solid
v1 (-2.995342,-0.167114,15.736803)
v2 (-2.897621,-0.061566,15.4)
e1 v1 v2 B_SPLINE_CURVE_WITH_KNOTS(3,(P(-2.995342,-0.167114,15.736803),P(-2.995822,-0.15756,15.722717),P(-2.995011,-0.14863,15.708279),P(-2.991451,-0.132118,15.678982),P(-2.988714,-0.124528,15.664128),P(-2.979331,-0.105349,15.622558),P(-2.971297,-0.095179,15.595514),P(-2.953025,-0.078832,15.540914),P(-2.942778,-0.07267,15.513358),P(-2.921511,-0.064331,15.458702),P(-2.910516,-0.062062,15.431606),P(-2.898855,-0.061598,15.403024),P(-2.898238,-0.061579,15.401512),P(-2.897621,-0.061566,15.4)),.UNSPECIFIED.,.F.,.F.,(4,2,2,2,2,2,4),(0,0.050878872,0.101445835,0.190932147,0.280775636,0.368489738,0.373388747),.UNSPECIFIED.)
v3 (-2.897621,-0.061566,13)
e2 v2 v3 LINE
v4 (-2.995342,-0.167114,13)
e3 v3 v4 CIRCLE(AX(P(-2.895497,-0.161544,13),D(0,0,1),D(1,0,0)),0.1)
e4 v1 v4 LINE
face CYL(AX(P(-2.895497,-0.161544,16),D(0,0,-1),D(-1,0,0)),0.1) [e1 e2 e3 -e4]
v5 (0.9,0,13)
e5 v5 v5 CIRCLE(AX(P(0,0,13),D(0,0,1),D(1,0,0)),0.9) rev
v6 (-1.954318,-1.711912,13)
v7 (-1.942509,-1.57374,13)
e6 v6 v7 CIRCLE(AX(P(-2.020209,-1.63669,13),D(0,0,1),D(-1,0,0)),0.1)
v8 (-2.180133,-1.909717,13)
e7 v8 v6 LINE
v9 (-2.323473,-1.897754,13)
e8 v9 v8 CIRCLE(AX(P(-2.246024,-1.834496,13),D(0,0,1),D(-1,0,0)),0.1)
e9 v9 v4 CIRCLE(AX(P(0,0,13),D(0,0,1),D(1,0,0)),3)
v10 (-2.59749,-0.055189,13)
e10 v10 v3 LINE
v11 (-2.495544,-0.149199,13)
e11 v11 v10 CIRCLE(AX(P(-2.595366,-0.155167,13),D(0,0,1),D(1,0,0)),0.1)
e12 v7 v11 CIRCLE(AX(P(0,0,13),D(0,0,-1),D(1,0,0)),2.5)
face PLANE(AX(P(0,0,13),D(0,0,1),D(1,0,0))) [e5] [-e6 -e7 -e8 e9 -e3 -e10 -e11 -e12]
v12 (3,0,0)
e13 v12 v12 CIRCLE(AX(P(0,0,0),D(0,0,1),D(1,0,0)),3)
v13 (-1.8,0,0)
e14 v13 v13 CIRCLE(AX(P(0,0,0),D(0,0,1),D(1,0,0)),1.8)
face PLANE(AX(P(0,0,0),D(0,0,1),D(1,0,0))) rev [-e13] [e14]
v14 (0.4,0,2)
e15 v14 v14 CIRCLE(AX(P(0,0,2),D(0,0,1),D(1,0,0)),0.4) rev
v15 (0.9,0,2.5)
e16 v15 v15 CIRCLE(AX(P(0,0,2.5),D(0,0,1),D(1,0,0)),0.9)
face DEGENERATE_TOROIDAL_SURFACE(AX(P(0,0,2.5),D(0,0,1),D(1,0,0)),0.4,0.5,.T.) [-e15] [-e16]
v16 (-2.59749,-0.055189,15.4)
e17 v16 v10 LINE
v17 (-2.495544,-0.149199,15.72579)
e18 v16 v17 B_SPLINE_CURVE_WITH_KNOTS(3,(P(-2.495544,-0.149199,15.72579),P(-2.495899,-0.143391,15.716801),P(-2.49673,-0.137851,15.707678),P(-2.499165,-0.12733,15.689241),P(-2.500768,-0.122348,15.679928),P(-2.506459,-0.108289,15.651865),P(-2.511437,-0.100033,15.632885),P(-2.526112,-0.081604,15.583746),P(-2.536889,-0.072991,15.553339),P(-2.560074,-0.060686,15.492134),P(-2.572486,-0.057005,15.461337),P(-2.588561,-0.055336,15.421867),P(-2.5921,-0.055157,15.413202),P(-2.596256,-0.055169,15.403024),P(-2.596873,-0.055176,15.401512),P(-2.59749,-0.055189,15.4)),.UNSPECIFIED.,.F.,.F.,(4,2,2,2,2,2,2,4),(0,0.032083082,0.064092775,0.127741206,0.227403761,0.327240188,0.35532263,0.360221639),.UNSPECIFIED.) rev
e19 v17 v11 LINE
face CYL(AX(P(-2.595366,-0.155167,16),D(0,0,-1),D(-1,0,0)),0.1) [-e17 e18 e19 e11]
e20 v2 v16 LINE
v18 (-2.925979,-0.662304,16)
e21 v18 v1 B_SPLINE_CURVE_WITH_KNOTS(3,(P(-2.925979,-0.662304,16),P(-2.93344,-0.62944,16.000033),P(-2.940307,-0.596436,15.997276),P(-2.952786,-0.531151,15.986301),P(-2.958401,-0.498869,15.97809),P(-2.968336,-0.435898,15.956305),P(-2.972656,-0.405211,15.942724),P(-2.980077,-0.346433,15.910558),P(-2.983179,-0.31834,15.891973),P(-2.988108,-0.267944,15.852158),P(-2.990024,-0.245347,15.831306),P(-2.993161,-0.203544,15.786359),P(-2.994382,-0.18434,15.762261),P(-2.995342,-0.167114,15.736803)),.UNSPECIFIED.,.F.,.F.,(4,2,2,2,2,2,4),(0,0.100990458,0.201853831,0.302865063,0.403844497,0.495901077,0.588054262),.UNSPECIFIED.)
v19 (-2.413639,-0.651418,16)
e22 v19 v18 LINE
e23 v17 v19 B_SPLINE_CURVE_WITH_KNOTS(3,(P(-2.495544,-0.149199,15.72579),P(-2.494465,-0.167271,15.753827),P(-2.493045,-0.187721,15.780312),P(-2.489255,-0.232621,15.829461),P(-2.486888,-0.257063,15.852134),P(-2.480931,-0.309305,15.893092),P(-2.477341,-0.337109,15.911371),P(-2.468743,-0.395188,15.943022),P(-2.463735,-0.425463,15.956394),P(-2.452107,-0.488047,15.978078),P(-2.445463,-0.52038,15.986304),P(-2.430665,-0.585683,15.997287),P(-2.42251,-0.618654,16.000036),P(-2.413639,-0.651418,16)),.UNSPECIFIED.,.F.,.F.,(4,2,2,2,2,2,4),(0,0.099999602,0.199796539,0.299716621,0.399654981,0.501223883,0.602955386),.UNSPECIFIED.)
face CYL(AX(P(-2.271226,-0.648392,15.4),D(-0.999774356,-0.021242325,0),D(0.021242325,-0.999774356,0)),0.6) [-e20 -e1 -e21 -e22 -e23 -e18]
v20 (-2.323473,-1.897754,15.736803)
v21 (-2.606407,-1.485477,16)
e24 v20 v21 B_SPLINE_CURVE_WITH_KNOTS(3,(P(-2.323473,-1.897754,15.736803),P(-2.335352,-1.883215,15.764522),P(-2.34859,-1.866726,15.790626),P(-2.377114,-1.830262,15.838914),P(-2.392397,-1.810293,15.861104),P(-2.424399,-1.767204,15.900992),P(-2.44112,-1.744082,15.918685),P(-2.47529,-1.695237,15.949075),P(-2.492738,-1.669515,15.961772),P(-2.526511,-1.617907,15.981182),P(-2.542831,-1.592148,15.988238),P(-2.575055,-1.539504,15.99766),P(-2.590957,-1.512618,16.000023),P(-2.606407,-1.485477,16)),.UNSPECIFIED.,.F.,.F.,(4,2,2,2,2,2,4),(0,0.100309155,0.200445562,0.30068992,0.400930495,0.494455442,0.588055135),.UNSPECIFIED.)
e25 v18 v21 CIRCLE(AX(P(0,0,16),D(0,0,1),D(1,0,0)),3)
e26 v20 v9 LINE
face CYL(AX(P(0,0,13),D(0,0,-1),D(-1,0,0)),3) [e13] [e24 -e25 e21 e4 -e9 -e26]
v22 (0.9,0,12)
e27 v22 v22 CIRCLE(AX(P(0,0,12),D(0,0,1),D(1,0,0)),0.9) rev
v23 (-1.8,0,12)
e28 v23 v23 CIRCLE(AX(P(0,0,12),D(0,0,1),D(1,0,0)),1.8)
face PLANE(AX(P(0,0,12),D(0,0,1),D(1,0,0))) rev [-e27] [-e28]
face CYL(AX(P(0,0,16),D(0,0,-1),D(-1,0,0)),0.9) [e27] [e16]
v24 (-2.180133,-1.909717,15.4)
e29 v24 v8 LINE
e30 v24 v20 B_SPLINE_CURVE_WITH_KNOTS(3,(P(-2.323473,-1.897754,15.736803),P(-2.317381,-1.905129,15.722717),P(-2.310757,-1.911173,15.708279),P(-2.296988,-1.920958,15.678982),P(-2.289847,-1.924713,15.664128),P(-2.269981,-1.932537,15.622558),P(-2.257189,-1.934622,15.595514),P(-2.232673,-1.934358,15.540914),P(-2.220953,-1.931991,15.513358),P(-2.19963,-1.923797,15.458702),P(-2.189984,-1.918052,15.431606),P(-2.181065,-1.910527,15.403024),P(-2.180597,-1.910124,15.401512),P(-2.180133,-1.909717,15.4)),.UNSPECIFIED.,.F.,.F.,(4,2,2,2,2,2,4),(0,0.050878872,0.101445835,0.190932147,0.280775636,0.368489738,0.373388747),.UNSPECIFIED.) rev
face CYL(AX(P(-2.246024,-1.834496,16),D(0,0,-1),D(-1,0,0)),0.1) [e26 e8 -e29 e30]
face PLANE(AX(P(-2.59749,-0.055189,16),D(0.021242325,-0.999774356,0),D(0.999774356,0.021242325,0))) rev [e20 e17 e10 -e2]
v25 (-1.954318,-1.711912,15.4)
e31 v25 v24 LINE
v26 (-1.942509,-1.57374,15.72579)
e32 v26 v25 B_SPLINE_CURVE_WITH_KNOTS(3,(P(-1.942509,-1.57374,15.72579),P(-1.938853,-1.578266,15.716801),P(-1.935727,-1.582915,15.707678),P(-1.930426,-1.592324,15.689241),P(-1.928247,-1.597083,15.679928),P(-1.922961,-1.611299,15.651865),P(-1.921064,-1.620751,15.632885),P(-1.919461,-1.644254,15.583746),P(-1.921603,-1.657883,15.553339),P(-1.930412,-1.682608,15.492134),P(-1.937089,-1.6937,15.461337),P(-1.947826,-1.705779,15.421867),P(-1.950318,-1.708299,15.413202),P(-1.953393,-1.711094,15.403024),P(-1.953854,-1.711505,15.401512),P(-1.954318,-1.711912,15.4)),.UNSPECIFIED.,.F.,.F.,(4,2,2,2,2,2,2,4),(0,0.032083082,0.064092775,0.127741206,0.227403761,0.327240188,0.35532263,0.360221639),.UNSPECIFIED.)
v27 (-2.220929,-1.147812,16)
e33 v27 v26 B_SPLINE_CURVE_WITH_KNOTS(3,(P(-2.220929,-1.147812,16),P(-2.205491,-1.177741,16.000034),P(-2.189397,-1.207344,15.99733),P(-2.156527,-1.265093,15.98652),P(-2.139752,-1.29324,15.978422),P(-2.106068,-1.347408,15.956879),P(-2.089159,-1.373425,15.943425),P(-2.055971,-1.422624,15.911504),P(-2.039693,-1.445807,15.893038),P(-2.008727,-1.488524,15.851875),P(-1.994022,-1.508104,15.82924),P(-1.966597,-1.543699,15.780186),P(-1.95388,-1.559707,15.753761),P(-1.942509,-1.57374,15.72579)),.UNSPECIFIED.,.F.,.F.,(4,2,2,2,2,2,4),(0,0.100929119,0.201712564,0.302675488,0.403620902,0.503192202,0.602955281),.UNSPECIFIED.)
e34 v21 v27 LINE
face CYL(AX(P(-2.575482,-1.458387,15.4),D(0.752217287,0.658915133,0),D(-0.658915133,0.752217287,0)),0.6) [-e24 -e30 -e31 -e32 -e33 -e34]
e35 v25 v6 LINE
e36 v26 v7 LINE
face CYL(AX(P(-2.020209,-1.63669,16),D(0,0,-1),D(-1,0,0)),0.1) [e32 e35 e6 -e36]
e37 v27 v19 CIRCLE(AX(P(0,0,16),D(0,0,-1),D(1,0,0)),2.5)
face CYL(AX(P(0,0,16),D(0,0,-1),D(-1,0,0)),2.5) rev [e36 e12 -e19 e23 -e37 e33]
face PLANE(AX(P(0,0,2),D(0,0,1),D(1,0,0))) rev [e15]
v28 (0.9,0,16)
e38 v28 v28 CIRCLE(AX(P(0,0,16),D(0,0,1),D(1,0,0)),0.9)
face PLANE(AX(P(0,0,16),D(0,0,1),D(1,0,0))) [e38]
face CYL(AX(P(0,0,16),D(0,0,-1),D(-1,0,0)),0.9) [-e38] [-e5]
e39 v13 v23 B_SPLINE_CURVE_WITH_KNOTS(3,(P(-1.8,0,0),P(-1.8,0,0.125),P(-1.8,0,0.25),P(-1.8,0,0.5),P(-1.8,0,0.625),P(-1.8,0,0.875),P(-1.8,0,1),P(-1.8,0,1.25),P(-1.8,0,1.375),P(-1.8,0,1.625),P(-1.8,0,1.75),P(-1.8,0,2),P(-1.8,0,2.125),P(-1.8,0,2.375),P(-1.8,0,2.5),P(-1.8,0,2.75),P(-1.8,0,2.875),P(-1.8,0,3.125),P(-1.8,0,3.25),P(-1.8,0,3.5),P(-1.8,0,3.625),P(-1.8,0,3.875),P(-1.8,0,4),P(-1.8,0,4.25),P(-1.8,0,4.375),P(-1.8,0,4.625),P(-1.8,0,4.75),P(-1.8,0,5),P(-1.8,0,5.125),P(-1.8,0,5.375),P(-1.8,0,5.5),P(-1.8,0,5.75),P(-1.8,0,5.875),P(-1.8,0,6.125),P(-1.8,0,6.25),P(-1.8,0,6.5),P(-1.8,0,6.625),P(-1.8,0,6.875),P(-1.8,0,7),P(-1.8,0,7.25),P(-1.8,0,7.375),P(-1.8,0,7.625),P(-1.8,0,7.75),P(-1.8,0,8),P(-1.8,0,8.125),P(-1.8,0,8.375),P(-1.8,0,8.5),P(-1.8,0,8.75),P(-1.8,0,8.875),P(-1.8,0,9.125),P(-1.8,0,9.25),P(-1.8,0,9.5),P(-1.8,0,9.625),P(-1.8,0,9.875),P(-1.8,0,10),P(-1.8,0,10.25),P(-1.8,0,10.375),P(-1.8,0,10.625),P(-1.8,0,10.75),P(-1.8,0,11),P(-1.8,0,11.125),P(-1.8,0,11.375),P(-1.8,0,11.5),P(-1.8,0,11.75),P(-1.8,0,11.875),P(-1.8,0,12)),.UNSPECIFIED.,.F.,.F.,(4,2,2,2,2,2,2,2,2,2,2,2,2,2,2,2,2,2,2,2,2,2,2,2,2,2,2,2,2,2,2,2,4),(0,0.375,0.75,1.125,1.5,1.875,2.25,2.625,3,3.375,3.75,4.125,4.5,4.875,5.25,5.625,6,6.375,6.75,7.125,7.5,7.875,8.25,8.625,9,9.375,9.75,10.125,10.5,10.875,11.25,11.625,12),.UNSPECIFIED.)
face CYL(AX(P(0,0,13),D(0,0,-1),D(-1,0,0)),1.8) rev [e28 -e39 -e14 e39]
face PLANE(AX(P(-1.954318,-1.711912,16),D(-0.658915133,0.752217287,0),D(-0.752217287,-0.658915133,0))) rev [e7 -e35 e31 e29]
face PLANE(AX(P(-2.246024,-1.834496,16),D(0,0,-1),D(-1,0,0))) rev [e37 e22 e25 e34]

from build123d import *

# Parameters (mm, degrees)
SKETCH_1_R           = 3
SKETCH_1_R_2         = 1.8
EXTRUDE_1_DEPTH      = 13
EXTRUDE_2_DEPTH      = 3
EXTRUDE_2_DEPTH_BACK = 11
SKETCH_2_R           = 0.9
FILLET_1_R           = 0.5
EXTRUDE_START        = -1
SKETCH_3_R           = 3
EXTRUDE_3_DEPTH      = 1
EXTRUDE_4_DEPTH      = 3
FILLET_2_R           = 0.6


with BuildPart() as part:
    # 草图1 → 凸台-拉伸1 (new body)
    with BuildSketch(Plane.XY):
        with Locations(Location((0, 0, 0), (0, 0, 180))):
            Circle(SKETCH_1_R)
        with Locations(Location((0, 0, 0), (0, 0, 180))):
            Circle(SKETCH_1_R_2, mode=Mode.SUBTRACT)
    extrude(amount=EXTRUDE_1_DEPTH)



with BuildPart() as body_2:
    # 草图2 → 凸台-拉伸2 (new, two sides: drawn at the far end of the back side and taken through both)
    with BuildSketch(Plane.XY.offset(13).offset(-EXTRUDE_2_DEPTH_BACK)):
        Circle(SKETCH_2_R)
    extrude(amount=EXTRUDE_2_DEPTH + EXTRUDE_2_DEPTH_BACK)

    # 圆角1
    fillet_1_edges = [body_2.edges().sort_by_distance(p)[0] for p in [
        (-0.9, 0, 2),
    ]]
    fillet(fillet_1_edges, radius=FILLET_1_R)


with BuildPart() as part_1:
    add(part.part)

    add(body_2.part)  # 凸台-拉伸3 merges body 2
    # 草图3 → 凸台-拉伸3 (add)
    with BuildSketch(Plane.XY.offset(13).offset(EXTRUDE_START)):
        with Locations(Location((0, 0, 0), (0, 0, 180))):
            Circle(SKETCH_3_R)
    extrude(amount=EXTRUDE_3_DEPTH)

    # 草图4 → 凸台-拉伸4 (add)
    with BuildSketch(Plane.XY.offset(13)):
        with BuildLine():
            Line((-2.597489972, -0.055189178), (-2.897621372, -0.061566106))
            ThreePointArc((-2.897621372, -0.061566106), (-2.968876341, -0.093606123), (-2.995341868, -0.167114008))
            ThreePointArc((-2.995341868, -0.167114008), (-2.796645847, -1.085712673), (-2.323473449, -1.897754234))
            ThreePointArc((-2.323473449, -1.897754234), (-2.254341449, -1.934149288), (-2.18013282, -1.909717488))
            Line((-2.18013282, -1.909717488), (-1.954317839, -1.711911733))
            ThreePointArc((-1.954317839, -1.711911733), (-1.920572579, -1.645205485), (-1.942508993, -1.573740389))
            ThreePointArc((-1.942508993, -1.573740389), (-2.330538206, -0.904760561), (-2.49554398, -0.149198667))
            ThreePointArc((-2.49554398, -0.149198667), (-2.527574533, -0.081652314), (-2.597489972, -0.055189178))
        make_face()
    extrude(amount=EXTRUDE_4_DEPTH)

    # 圆角2
    # the kernel refuses this fillet: 0.6 mm, written as the material it takes off along each edge
    with BuildSketch(Plane(origin=(-1.097828437, -0.023325691, 16), x_dir=(0, 0, -1), z_dir=(-0.9997743563663354, -0.021242324549825015, 0)), Plane(origin=(-3.308458751, -2.898090189, 16), x_dir=(0, 0, -1), z_dir=(0.7522172870457152, 0.6589151334349395, 0))) as fillet_2_piece_1:
        with BuildLine():
            CenterArc((FILLET_2_R, FILLET_2_R), FILLET_2_R, 180, 90)
            Line((0, FILLET_2_R), (0, 0))
            Line((0, 0), (FILLET_2_R, 0))
        make_face()
    extrude(amount=3.300199138, mode=Mode.SUBTRACT)


solid = part_1.part
